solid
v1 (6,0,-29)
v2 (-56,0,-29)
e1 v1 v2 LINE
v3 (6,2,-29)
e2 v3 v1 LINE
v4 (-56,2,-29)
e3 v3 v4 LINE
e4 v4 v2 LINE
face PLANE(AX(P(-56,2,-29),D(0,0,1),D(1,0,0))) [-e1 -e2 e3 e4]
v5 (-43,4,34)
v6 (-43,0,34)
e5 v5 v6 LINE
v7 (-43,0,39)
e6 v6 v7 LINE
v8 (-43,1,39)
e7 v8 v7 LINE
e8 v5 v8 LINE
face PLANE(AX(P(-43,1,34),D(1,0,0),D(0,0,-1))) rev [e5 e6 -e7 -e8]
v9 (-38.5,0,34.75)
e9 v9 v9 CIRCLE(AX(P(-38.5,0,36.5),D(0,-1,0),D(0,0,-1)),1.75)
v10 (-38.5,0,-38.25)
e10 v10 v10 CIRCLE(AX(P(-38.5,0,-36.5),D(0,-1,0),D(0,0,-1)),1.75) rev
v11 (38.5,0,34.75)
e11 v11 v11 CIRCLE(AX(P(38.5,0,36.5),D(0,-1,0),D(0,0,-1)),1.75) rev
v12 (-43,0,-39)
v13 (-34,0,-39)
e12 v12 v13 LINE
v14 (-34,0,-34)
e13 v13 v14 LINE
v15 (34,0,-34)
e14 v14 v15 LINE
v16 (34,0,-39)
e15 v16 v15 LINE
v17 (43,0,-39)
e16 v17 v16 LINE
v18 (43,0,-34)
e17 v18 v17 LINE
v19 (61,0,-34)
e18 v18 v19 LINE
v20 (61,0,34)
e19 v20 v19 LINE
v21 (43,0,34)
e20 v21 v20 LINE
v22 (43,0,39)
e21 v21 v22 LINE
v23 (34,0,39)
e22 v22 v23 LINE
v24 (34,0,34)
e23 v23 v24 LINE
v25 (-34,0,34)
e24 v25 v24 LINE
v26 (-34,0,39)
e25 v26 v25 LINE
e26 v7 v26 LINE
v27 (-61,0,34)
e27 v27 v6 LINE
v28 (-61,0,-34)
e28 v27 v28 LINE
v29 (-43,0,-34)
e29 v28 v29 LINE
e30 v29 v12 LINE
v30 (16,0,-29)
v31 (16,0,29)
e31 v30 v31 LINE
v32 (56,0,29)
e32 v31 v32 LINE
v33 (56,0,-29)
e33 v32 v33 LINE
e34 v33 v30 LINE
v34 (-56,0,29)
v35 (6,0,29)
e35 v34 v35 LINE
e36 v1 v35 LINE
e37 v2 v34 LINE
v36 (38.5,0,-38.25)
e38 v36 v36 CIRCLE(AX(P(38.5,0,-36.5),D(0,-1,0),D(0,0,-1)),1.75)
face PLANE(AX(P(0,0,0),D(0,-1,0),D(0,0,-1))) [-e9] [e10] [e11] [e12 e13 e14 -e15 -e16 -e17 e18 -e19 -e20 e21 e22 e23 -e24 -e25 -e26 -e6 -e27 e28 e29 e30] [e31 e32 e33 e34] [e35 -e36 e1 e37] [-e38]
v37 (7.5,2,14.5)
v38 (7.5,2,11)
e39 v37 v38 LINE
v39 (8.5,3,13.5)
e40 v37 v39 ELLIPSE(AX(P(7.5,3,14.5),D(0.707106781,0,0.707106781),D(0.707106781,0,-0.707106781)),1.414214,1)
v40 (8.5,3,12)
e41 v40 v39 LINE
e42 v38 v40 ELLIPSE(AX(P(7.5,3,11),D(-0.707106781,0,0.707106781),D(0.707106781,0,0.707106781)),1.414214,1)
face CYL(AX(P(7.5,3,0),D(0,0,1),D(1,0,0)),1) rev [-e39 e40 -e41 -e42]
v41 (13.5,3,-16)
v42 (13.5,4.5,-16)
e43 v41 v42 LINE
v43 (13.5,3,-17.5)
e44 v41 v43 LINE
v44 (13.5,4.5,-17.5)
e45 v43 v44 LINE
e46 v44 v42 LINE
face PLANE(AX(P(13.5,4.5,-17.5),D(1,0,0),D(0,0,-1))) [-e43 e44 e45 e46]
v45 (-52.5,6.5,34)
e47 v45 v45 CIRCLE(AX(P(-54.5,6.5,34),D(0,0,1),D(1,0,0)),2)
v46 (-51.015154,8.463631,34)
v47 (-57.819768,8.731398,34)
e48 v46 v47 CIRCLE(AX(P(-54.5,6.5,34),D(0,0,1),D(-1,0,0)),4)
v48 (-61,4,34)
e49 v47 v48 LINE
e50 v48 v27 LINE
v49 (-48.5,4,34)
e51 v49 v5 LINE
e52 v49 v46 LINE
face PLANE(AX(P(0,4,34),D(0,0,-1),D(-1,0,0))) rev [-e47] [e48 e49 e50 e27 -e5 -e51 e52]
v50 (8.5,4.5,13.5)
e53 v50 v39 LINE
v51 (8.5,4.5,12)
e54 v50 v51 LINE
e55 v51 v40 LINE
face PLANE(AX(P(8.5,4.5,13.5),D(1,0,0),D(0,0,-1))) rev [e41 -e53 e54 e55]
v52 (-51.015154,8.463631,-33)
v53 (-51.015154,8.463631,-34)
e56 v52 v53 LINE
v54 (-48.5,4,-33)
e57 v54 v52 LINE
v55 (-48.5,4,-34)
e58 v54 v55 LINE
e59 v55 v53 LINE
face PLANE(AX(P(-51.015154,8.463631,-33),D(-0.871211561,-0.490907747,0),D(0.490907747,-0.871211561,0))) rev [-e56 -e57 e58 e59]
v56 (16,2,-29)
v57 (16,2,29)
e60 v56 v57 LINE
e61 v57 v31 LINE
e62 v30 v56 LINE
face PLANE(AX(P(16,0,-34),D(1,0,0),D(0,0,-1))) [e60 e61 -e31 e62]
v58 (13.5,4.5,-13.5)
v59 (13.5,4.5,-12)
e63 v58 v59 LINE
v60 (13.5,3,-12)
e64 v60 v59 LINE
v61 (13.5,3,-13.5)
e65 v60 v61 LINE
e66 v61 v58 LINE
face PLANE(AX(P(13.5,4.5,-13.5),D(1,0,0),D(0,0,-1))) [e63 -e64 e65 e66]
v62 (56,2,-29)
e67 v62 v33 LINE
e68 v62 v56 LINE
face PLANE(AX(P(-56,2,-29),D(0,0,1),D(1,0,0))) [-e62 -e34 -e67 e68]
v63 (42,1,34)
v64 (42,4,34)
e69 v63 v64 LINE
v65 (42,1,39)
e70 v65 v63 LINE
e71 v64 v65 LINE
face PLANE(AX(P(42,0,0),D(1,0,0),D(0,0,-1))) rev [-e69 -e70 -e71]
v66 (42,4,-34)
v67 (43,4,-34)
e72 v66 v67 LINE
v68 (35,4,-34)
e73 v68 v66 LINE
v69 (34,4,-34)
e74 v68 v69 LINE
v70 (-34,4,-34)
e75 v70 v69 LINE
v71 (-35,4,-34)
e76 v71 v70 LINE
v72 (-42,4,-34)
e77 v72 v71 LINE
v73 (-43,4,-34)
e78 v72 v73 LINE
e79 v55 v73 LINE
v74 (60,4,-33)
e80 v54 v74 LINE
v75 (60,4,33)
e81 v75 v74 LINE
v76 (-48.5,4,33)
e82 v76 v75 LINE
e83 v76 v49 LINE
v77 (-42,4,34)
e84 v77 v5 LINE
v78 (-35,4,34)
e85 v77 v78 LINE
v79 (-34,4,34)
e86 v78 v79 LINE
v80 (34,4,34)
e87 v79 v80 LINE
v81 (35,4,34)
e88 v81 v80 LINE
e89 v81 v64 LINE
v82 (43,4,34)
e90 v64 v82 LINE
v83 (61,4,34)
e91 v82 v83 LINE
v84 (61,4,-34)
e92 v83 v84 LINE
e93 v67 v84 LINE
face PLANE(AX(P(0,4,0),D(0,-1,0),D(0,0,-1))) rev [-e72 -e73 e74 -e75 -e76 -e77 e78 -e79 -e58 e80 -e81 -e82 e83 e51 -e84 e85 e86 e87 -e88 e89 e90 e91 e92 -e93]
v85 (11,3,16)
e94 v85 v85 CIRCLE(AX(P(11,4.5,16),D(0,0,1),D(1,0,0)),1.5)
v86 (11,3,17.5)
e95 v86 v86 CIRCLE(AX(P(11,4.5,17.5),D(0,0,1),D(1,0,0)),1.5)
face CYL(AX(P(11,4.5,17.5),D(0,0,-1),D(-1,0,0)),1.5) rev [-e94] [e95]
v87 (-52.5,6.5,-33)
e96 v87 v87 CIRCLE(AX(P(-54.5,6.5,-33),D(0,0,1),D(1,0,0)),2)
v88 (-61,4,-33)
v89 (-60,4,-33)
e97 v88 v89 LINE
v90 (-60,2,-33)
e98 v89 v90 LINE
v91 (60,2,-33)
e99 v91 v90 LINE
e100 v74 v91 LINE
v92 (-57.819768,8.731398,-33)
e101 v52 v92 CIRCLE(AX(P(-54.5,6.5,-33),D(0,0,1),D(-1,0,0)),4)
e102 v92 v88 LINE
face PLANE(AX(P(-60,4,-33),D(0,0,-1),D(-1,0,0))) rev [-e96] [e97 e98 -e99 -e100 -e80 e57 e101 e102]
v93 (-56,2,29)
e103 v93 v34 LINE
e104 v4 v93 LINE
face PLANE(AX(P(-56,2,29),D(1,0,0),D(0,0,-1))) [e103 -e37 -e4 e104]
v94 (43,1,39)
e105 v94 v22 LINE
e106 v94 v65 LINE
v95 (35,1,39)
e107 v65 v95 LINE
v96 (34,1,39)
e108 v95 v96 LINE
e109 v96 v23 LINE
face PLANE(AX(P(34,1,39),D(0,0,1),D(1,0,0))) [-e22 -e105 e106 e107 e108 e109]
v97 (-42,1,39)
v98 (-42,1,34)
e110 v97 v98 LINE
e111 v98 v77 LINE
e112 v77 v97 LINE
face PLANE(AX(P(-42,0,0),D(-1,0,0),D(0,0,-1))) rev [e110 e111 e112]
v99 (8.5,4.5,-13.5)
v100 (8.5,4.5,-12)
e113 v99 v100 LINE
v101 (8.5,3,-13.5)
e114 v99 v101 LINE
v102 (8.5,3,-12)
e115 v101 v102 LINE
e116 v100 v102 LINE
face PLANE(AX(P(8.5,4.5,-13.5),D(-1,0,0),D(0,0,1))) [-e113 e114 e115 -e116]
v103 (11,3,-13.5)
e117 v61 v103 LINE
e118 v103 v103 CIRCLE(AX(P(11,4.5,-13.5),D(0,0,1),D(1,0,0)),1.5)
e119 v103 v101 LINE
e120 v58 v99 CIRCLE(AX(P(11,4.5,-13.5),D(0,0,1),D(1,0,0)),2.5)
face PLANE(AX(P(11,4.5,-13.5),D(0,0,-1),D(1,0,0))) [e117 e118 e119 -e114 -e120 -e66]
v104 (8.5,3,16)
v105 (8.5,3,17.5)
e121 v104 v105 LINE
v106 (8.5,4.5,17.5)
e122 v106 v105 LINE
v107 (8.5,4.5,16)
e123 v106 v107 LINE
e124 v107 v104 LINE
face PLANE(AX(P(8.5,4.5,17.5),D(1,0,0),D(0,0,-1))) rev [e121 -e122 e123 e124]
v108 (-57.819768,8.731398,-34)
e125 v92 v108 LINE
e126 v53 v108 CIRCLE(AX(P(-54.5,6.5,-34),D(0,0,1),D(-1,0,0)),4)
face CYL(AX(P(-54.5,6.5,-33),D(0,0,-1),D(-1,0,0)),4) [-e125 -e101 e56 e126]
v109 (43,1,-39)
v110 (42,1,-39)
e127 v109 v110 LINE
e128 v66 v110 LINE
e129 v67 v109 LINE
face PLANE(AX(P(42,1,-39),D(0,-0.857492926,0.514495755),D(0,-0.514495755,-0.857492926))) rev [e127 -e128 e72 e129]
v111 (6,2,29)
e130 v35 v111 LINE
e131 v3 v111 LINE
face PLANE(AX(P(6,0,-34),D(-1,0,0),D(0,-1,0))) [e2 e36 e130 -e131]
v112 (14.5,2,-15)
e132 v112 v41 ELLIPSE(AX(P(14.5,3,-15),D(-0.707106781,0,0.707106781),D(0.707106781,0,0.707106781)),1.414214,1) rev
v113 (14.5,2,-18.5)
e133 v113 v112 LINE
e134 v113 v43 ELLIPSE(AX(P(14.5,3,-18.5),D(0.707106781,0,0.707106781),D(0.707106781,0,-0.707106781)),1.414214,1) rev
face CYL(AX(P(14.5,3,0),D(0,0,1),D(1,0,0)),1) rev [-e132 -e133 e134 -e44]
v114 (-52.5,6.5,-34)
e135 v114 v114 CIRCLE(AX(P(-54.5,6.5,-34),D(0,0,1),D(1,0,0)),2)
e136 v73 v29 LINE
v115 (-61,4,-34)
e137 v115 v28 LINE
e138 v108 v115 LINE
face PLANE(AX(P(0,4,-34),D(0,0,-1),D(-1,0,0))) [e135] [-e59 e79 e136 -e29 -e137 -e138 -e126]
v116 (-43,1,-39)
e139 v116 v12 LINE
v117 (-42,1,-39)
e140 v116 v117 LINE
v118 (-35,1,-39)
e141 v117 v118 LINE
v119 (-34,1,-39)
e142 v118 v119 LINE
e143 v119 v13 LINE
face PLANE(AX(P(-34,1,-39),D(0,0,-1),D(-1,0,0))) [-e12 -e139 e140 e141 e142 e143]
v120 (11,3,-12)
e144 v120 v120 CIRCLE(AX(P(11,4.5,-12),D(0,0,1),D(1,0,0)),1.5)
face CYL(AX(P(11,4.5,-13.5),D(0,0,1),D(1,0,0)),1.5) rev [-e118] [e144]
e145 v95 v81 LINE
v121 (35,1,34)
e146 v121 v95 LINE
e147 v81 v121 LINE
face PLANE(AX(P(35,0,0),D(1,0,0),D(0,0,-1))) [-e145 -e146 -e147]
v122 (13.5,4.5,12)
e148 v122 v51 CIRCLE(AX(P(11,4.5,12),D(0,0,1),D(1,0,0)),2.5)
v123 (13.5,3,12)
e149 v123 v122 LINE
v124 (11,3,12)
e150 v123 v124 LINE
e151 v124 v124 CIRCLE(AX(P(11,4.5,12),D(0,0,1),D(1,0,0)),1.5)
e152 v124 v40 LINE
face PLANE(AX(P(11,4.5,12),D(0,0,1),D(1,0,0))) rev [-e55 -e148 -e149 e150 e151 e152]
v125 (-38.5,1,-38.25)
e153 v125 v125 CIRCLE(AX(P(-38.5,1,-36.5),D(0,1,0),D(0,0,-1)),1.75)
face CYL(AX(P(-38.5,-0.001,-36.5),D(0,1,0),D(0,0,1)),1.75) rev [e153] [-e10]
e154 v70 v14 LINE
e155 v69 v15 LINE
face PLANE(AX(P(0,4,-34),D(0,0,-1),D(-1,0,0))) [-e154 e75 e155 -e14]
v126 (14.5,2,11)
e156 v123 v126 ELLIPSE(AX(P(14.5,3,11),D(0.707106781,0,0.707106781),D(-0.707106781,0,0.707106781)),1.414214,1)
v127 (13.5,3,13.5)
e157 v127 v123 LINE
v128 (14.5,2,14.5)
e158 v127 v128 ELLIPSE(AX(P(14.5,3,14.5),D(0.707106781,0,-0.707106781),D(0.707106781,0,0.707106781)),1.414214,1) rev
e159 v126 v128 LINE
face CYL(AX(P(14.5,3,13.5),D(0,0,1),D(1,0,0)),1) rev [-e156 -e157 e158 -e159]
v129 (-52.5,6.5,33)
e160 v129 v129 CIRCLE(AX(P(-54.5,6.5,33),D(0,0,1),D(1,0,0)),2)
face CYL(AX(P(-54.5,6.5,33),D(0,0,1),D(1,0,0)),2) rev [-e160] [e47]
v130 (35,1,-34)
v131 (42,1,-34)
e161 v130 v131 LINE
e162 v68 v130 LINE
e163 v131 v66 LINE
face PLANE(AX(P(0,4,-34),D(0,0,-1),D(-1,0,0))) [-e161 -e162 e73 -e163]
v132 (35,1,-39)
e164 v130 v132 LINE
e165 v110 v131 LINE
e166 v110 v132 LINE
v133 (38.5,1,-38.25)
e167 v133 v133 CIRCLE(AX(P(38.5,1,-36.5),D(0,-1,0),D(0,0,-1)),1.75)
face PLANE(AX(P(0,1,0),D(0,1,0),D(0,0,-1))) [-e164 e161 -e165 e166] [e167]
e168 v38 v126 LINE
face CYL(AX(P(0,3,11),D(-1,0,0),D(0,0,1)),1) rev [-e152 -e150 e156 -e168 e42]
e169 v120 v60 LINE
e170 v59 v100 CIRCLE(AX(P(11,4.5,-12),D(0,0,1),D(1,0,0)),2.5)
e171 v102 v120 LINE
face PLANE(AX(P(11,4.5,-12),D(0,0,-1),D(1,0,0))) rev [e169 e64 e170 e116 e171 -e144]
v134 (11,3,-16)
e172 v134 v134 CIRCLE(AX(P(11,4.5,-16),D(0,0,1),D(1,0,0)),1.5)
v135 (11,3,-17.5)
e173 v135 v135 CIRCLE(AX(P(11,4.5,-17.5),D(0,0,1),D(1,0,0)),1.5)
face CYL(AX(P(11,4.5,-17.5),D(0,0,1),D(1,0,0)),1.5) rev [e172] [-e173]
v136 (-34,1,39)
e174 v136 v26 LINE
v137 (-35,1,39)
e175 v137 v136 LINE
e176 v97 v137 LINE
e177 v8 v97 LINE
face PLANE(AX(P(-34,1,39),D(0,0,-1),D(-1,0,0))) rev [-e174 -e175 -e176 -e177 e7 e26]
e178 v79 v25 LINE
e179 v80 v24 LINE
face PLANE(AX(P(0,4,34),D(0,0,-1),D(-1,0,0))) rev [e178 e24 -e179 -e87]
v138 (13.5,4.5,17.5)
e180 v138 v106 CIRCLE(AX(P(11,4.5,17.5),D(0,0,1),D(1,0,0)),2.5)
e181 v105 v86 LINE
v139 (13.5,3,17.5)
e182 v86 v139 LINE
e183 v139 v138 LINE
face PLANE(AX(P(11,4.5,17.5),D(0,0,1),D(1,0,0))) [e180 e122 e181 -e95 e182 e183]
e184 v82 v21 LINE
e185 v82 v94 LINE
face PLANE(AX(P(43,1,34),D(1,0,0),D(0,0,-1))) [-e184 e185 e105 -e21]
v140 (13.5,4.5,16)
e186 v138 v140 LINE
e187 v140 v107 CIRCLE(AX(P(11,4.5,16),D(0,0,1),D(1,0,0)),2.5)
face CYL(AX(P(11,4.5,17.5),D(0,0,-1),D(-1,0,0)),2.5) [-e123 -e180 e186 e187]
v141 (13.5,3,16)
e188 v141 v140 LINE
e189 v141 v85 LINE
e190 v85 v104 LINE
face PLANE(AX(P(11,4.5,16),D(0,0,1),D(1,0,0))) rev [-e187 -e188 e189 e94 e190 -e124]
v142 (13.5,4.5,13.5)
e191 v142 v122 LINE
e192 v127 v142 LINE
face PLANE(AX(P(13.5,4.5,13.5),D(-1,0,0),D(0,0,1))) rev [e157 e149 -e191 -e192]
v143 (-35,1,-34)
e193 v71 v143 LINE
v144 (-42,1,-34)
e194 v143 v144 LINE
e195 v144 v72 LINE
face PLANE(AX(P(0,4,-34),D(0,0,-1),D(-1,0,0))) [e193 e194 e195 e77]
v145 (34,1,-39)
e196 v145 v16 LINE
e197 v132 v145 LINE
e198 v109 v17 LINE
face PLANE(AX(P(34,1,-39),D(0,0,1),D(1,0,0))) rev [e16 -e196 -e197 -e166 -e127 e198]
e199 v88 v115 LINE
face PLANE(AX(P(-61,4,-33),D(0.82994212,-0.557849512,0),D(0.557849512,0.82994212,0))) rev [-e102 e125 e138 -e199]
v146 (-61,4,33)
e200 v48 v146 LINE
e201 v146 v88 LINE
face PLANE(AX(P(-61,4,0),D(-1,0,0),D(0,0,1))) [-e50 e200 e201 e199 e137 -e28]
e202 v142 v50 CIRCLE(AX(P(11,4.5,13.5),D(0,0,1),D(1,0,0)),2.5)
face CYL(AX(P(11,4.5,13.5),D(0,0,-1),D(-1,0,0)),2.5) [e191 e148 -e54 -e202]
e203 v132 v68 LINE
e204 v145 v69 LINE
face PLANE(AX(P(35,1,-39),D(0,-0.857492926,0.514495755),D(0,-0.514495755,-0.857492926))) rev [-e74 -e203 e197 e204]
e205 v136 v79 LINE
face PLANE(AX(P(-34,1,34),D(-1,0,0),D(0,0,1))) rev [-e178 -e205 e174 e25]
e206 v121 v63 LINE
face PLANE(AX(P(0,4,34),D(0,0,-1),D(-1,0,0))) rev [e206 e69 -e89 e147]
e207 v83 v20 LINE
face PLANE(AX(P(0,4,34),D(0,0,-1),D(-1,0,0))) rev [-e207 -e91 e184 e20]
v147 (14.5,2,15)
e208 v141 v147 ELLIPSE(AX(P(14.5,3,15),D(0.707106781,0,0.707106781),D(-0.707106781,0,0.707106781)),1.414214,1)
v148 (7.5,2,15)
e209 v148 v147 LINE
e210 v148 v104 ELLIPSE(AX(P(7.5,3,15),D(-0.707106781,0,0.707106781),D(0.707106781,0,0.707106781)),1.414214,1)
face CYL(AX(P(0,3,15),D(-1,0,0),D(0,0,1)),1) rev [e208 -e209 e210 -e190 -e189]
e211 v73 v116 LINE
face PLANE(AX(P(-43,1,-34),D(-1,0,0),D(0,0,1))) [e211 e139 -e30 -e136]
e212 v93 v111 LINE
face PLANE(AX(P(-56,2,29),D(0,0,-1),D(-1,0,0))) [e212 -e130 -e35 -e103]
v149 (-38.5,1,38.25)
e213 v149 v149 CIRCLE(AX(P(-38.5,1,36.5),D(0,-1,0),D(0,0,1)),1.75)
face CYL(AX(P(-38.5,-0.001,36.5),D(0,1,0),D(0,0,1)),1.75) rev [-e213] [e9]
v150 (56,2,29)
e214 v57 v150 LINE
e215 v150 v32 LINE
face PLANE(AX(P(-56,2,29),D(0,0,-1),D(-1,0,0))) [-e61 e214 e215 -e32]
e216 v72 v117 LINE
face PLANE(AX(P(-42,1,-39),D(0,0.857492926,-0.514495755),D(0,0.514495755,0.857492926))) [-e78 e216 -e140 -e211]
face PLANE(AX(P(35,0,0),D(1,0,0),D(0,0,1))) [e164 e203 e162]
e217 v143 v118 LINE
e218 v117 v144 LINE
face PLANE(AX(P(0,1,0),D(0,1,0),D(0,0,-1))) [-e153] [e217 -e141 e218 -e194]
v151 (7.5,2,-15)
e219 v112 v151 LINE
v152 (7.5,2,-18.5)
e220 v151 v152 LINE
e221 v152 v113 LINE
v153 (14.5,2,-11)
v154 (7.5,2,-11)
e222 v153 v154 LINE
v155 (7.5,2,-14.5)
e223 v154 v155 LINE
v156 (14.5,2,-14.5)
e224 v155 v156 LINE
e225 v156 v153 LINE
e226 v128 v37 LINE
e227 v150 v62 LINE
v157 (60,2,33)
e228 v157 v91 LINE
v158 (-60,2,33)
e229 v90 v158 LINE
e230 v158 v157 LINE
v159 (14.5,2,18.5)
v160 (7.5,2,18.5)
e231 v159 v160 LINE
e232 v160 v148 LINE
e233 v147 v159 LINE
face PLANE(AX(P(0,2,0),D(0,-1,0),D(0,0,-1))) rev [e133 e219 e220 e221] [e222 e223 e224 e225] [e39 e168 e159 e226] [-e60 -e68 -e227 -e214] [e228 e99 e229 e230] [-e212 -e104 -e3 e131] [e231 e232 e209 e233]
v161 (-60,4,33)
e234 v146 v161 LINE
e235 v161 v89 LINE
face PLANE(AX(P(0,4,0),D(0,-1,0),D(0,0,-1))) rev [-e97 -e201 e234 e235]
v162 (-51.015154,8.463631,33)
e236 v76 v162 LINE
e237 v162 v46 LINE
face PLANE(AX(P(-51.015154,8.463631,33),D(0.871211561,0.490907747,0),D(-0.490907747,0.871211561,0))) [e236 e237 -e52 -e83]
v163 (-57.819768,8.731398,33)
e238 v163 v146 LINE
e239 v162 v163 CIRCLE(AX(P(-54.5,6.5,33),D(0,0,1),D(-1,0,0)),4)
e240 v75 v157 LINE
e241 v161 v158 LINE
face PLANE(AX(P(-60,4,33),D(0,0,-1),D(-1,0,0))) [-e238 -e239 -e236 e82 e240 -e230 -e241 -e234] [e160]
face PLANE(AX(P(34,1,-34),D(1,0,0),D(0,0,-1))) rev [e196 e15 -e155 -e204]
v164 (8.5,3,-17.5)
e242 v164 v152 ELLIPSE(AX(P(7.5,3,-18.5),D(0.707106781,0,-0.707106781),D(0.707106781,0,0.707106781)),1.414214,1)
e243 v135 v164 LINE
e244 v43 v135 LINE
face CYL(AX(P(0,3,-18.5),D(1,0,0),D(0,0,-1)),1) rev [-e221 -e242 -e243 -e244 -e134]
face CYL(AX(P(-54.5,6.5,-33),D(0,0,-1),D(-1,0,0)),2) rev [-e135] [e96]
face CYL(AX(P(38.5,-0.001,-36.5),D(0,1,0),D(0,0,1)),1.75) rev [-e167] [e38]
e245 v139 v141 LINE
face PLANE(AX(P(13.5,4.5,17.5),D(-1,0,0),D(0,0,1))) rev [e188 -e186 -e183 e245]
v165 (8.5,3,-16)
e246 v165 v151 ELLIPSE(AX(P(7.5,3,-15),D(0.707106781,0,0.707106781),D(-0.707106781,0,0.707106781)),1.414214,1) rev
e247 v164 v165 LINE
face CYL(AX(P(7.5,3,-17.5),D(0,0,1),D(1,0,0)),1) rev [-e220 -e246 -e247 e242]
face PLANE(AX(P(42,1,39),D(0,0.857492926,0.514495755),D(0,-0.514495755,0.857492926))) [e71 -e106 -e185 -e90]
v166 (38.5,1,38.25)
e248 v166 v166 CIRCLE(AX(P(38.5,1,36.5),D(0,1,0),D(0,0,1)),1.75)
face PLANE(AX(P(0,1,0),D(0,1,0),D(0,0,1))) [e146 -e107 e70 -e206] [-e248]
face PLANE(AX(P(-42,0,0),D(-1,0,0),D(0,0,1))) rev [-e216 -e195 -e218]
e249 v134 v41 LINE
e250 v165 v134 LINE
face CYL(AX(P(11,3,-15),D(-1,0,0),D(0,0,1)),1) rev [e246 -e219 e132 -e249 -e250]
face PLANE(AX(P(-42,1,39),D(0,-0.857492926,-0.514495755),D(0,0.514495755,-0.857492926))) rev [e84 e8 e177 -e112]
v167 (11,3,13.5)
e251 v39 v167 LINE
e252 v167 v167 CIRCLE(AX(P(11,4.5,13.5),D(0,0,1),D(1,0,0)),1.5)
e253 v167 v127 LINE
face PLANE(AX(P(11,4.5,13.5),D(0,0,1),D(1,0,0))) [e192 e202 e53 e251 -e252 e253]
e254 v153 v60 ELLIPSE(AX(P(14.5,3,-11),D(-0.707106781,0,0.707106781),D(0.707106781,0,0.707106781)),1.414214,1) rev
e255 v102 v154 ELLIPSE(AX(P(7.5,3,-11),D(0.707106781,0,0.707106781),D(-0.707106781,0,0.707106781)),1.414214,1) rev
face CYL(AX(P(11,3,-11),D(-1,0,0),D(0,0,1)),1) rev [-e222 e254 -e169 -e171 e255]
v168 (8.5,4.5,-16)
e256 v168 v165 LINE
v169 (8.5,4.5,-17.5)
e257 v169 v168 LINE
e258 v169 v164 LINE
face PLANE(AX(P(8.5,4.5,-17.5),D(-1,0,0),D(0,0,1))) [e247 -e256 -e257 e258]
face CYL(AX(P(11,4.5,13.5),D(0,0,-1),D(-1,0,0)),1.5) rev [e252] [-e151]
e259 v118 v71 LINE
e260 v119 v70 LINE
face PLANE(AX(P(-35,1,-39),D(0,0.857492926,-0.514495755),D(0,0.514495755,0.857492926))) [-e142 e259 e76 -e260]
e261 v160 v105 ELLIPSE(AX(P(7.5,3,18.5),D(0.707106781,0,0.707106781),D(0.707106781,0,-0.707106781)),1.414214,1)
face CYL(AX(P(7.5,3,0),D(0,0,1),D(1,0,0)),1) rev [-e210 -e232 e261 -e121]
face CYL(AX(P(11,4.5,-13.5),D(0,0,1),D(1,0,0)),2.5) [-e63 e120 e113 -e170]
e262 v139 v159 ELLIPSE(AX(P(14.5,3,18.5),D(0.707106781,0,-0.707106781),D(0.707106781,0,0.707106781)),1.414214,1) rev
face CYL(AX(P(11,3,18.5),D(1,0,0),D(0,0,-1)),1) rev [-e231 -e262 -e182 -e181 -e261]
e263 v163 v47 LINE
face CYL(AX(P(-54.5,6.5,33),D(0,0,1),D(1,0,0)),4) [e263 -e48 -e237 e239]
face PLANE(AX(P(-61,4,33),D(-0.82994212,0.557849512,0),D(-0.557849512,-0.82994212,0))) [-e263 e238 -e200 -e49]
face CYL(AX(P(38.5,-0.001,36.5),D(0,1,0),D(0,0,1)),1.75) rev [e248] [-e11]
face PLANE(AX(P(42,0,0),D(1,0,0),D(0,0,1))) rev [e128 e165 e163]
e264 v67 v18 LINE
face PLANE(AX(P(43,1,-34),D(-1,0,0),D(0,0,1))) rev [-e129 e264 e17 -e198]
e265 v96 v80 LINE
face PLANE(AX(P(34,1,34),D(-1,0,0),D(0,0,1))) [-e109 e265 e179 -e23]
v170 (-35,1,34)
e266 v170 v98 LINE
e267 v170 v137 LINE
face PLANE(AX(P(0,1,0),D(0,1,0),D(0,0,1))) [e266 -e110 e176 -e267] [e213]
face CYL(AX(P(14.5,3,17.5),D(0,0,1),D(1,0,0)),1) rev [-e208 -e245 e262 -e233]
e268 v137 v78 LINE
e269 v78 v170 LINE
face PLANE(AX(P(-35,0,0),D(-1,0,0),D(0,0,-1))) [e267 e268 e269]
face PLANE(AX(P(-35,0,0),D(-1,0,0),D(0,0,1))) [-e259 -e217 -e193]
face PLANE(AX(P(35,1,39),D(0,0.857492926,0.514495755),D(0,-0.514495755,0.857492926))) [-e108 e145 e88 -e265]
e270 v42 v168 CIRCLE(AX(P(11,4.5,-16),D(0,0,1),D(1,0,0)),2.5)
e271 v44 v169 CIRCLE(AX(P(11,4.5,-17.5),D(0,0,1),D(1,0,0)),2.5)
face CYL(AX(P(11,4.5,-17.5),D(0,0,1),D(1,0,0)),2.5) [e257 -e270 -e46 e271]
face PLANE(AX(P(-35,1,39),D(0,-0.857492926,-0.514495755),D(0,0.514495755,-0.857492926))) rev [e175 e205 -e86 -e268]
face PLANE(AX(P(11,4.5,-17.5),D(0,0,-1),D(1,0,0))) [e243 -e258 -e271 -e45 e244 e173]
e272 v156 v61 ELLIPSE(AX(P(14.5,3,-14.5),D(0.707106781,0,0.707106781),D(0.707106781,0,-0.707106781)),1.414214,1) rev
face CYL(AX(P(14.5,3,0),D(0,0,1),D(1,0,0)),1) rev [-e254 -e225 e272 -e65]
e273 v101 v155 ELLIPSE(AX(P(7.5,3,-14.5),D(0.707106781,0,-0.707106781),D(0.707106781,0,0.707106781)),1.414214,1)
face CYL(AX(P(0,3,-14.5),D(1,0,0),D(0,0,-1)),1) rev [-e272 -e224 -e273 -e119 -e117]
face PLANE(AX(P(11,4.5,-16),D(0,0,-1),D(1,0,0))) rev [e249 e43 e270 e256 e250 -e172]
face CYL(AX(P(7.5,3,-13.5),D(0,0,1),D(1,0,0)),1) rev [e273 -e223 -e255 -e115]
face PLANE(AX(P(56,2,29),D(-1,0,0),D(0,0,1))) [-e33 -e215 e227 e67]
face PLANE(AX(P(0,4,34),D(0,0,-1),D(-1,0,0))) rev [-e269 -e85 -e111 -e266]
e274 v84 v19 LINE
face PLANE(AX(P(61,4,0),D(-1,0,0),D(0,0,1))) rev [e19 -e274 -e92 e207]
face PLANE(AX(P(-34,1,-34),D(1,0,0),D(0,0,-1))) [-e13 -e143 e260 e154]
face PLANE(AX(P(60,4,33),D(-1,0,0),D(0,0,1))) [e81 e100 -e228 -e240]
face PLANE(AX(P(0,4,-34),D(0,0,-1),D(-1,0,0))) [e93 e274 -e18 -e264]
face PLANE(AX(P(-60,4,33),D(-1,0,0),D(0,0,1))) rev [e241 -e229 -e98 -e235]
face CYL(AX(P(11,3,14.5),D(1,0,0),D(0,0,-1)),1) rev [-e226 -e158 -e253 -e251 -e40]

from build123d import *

# Parameters (mm, degrees)
SKETCH_2_W               = 120
SKETCH_2_H               = 66
SKETCH_2_W_2             = 112
SKETCH_2_H_2             = 58
EXTRUDE_1_DEPTH          = 2
SKETCH_2_2_W             = 122
SKETCH_2_2_H             = 68
SKETCH_2_2_W_2           = 120
SKETCH_2_2_H_2           = 66
EXTRUDE_1_2_DEPTH        = 4
SKETCH_3_R               = 2
EXTRUDE_2_DEPTH          = 1
SKETCH_4_W               = 10
SKETCH_4_H               = 2
EXTRUDE_3_DEPTH          = 68
EXTRUDE_START            = 12
SKETCH_5_R               = 1.5
EXTRUDE_4_DEPTH          = 1.5
EXTRUDE_START_2          = 16
SKETCH_5_3_R             = 1.5
EXTRUDE_6_DEPTH          = 1.5
FILLET_2_R               = 1
FILLET_2_OF_MIRROR_3_R   = 1
SKETCH_7_W               = 9
SKETCH_7_H               = 5
EXTRUDE_7_DEPTH          = 1
EXTRUDE_8_DEPTH          = 1
EXTRUDE_9_DEPTH          = 1
CUT_EXTRUDE_1_REACH      = 75.022
SKETCH_10_R              = 1.75
MIRROR_6_COPY_1_SKETCH_W = 9
MIRROR_6_COPY_1_SKETCH_H = 5
MIRROR_6_COPY_1_DEPTH    = 1
MIRROR_6_COPY_2_DEPTH    = 1
MIRROR_6_COPY_3_DEPTH    = 1
MIRROR_6_COPY_4_REACH    = 75.022
MIRROR_6_COPY_4_SKETCH_R = 1.75


with BuildPart() as part:
    # 草圖2 → Extrude 1 (new body)
    with BuildSketch(Plane(origin=(0, 0, 0), x_dir=(1, 0, 0), z_dir=(0, 1, 0))):
        Rectangle(SKETCH_2_W, SKETCH_2_H)
        Rectangle(SKETCH_2_W_2, SKETCH_2_H_2, mode=Mode.SUBTRACT)
    extrude(amount=EXTRUDE_1_DEPTH)

    # 草圖2<2> → Extrude 1 2 (add)
    with BuildSketch(Plane(origin=(0, 0, 0), x_dir=(1, 0, 0), z_dir=(0, 1, 0))):
        Rectangle(SKETCH_2_2_W, SKETCH_2_2_H)
        Rectangle(SKETCH_2_2_W_2, SKETCH_2_2_H_2, mode=Mode.SUBTRACT)
    extrude(amount=EXTRUDE_1_2_DEPTH)

    # 草圖3 → 填料-伸長2 (add)
    with BuildSketch(Plane.XY.offset(34)):
        with BuildLine():
            Line((-61, 4), (-57.819768479, 8.731398047))
            ThreePointArc((-57.819768479, 8.731398047), (-54.342718511, 10.496906621), (-51.015153756, 8.463630987))
            Line((-51.015153756, 8.463630987), (-48.5, 4))
            Line((-48.5, 4), (-61, 4))
        make_face()
        with Locations((-54.5, 6.5)):
            Circle(SKETCH_3_R, mode=Mode.SUBTRACT)
    extrude_2 = extrude(amount=-EXTRUDE_2_DEPTH)

    # 鏡射1: 填料-伸長2 across plane
    add(extrude_2.mirror(Plane.XY))

    # 草圖4 → 填料-伸長3 (add)
    with BuildSketch(Plane.XY.offset(34)):
        with Locations((11, 1)):
            Rectangle(SKETCH_4_W, SKETCH_4_H)
    extrude(amount=-EXTRUDE_3_DEPTH)

    # 草圖5 → 填料-伸長4 (add)
    with BuildSketch(Plane.XY.offset(EXTRUDE_START)):
        with BuildLine():
            Line((8.5, 4.5), (8.5, 2))
            Line((8.5, 2), (13.5, 2))
            Line((13.5, 2), (13.5, 4.5))
            ThreePointArc((13.5, 4.5), (11, 7), (8.5, 4.5))
        make_face()
        with Locations((11, 4.5)):
            Circle(SKETCH_5_R, mode=Mode.SUBTRACT)
    extrude_4 = extrude(amount=EXTRUDE_4_DEPTH)

    # 草圖5<3> → 填料-伸長6 (add)
    with BuildSketch(Plane.XY.offset(EXTRUDE_START_2)):
        with BuildLine():
            Line((8.5, 4.5), (8.5, 2))
            Line((8.5, 2), (13.5, 2))
            Line((13.5, 2), (13.5, 4.5))
            ThreePointArc((13.5, 4.5), (11, 7), (8.5, 4.5))
        make_face()
        with Locations((11, 4.5)):
            Circle(SKETCH_5_3_R, mode=Mode.SUBTRACT)
    extrude_6 = extrude(amount=EXTRUDE_6_DEPTH)

    # 圓角2
    fillet_2_edges = [part.edges().sort_by_distance(p)[0] for p in [
        (11, 2, 13.5),
        (11, 2, 12),
        (8.5, 2, 12.75),
        (13.5, 2, 12.75),
        (11, 2, 17.5),
        (11, 2, 16),
        (8.5, 2, 16.75),
        (13.5, 2, 16.75),
    ]]
    fillet(fillet_2_edges, radius=FILLET_2_R - 0.0001)  # a hair under: the kernel refuses the full size

    # 鏡射3: 填料-伸長4, 填料-伸長6 across plane
    add(extrude_4.mirror(Plane.XY))
    add(extrude_6.mirror(Plane.XY))

    # 圓角2 of 鏡射3
    fillet_2_of_mirror_3_edges = [part.edges().sort_by_distance(p)[0] for p in [
        (11, 2, -13.5),
        (11, 2, -12),
        (8.5, 2, -12.75),
        (13.5, 2, -12.75),
        (11, 2, -17.5),
        (11, 2, -16),
        (8.5, 2, -16.75),
        (13.5, 2, -16.75),
    ]]
    fillet(fillet_2_of_mirror_3_edges, radius=FILLET_2_OF_MIRROR_3_R - 0.0001)  # a hair under: the kernel refuses the full size

    # 草圖7 → 填料-伸長7 (add)
    with BuildSketch(Plane.XZ):
        with Locations((38.5, 36.5)):
            Rectangle(SKETCH_7_W, SKETCH_7_H)
    extrude_7 = extrude(amount=-EXTRUDE_7_DEPTH)

    # 草圖8 → 填料-伸長8 (add)
    with BuildSketch(Plane(origin=(43, 0, 0), x_dir=(0, 0, -1), z_dir=(1, 0, 0))):
        Polygon((-39, 1), (-34, 4), (-34, 1), align=None)
    extrude_8 = extrude(amount=-EXTRUDE_8_DEPTH)

    # 草圖9 → 填料-伸長9 (add)
    with BuildSketch(Plane.ZY.offset(-34)):
        Polygon((39, 1), (34, 4), (34, 1), align=None)
    extrude_9 = extrude(amount=-EXTRUDE_9_DEPTH)

    # 草圖10 → 除料-伸長1 (cut, up to next)
    with BuildSketch(Plane(origin=(0, 1, 0), x_dir=(1, 0, 0), z_dir=(0, 1, 0)), mode=Mode.PRIVATE) as cut_extrude_1_sk1:
        with Locations(Location((38.5, -36.5, 0), (0, 0, 270))):
            Circle(SKETCH_10_R)
    cut_extrude_1_tool1 = extrude(cut_extrude_1_sk1.sketch, amount=-CUT_EXTRUDE_1_REACH, mode=Mode.PRIVATE) & part.part
    cut_extrude_1 = cut_extrude_1_tool1.solids().sort_by_distance((38.5, 1, 36.5))[0]
    add(cut_extrude_1, mode=Mode.SUBTRACT)

    # 鏡射5: 填料-伸長7, 填料-伸長8, 填料-伸長9, 除料-伸長1 across plane
    add(extrude_7.mirror(Plane.XY))
    add(extrude_8.mirror(Plane.XY))
    add(extrude_9.mirror(Plane.XY))
    add(cut_extrude_1.mirror(Plane.XY), mode=Mode.SUBTRACT)

    # 鏡射6: 填料-伸長7, 填料-伸長8, 填料-伸長9, 除料-伸長1 across plane
    add(extrude_7.mirror(Plane(origin=(0, 0, 0), x_dir=(0, 0, 1), z_dir=(1, 0, 0))))
    add(extrude_8.mirror(Plane(origin=(0, 0, 0), x_dir=(0, 0, 1), z_dir=(1, 0, 0))))
    add(extrude_9.mirror(Plane(origin=(0, 0, 0), x_dir=(0, 0, 1), z_dir=(1, 0, 0))))
    add(cut_extrude_1.mirror(Plane(origin=(0, 0, 0), x_dir=(0, 0, 1), z_dir=(1, 0, 0))), mode=Mode.SUBTRACT)

    # 鏡射6 copy 1 sketch → 鏡射6 copy 1 (add)
    with BuildSketch(Plane(origin=(0, 0, 0), x_dir=(-1, 0, 0), z_dir=(0, -1, 0))):
        with Locations((38.5, 36.5)):
            Rectangle(MIRROR_6_COPY_1_SKETCH_W, MIRROR_6_COPY_1_SKETCH_H)
    extrude(amount=-MIRROR_6_COPY_1_DEPTH)

    # 鏡射6 copy 2 sketch → 鏡射6 copy 2 (add)
    with BuildSketch(Plane.ZY.offset(43)):
        Polygon((-39, 1), (-34, 4), (-34, 1), align=None)
    extrude(amount=-MIRROR_6_COPY_2_DEPTH)

    # 鏡射6 copy 3 sketch → 鏡射6 copy 3 (add)
    with BuildSketch(Plane(origin=(-34, 0, 0), x_dir=(0, 0, -1), z_dir=(1, 0, 0))):
        Polygon((39, 1), (34, 4), (34, 1), align=None)
    extrude(amount=-MIRROR_6_COPY_3_DEPTH)

    # 鏡射6 copy 4 sketch → 鏡射6 copy 4 (cut, up to next)
    with BuildSketch(Plane(origin=(0, 1, 0), x_dir=(-1, 0, 0), z_dir=(0, 1, 0)), mode=Mode.PRIVATE) as mirror_6_copy_4_sk1:
        with Locations(Location((38.5, -36.5, 0), (0, 0, 270))):
            Circle(MIRROR_6_COPY_4_SKETCH_R)
    mirror_6_copy_4_tool1 = extrude(mirror_6_copy_4_sk1.sketch, amount=-MIRROR_6_COPY_4_REACH, mode=Mode.PRIVATE) & part.part
    add(mirror_6_copy_4_tool1.solids().sort_by_distance((-38.5, 1, -36.5))[0], mode=Mode.SUBTRACT)


solid = part.part
